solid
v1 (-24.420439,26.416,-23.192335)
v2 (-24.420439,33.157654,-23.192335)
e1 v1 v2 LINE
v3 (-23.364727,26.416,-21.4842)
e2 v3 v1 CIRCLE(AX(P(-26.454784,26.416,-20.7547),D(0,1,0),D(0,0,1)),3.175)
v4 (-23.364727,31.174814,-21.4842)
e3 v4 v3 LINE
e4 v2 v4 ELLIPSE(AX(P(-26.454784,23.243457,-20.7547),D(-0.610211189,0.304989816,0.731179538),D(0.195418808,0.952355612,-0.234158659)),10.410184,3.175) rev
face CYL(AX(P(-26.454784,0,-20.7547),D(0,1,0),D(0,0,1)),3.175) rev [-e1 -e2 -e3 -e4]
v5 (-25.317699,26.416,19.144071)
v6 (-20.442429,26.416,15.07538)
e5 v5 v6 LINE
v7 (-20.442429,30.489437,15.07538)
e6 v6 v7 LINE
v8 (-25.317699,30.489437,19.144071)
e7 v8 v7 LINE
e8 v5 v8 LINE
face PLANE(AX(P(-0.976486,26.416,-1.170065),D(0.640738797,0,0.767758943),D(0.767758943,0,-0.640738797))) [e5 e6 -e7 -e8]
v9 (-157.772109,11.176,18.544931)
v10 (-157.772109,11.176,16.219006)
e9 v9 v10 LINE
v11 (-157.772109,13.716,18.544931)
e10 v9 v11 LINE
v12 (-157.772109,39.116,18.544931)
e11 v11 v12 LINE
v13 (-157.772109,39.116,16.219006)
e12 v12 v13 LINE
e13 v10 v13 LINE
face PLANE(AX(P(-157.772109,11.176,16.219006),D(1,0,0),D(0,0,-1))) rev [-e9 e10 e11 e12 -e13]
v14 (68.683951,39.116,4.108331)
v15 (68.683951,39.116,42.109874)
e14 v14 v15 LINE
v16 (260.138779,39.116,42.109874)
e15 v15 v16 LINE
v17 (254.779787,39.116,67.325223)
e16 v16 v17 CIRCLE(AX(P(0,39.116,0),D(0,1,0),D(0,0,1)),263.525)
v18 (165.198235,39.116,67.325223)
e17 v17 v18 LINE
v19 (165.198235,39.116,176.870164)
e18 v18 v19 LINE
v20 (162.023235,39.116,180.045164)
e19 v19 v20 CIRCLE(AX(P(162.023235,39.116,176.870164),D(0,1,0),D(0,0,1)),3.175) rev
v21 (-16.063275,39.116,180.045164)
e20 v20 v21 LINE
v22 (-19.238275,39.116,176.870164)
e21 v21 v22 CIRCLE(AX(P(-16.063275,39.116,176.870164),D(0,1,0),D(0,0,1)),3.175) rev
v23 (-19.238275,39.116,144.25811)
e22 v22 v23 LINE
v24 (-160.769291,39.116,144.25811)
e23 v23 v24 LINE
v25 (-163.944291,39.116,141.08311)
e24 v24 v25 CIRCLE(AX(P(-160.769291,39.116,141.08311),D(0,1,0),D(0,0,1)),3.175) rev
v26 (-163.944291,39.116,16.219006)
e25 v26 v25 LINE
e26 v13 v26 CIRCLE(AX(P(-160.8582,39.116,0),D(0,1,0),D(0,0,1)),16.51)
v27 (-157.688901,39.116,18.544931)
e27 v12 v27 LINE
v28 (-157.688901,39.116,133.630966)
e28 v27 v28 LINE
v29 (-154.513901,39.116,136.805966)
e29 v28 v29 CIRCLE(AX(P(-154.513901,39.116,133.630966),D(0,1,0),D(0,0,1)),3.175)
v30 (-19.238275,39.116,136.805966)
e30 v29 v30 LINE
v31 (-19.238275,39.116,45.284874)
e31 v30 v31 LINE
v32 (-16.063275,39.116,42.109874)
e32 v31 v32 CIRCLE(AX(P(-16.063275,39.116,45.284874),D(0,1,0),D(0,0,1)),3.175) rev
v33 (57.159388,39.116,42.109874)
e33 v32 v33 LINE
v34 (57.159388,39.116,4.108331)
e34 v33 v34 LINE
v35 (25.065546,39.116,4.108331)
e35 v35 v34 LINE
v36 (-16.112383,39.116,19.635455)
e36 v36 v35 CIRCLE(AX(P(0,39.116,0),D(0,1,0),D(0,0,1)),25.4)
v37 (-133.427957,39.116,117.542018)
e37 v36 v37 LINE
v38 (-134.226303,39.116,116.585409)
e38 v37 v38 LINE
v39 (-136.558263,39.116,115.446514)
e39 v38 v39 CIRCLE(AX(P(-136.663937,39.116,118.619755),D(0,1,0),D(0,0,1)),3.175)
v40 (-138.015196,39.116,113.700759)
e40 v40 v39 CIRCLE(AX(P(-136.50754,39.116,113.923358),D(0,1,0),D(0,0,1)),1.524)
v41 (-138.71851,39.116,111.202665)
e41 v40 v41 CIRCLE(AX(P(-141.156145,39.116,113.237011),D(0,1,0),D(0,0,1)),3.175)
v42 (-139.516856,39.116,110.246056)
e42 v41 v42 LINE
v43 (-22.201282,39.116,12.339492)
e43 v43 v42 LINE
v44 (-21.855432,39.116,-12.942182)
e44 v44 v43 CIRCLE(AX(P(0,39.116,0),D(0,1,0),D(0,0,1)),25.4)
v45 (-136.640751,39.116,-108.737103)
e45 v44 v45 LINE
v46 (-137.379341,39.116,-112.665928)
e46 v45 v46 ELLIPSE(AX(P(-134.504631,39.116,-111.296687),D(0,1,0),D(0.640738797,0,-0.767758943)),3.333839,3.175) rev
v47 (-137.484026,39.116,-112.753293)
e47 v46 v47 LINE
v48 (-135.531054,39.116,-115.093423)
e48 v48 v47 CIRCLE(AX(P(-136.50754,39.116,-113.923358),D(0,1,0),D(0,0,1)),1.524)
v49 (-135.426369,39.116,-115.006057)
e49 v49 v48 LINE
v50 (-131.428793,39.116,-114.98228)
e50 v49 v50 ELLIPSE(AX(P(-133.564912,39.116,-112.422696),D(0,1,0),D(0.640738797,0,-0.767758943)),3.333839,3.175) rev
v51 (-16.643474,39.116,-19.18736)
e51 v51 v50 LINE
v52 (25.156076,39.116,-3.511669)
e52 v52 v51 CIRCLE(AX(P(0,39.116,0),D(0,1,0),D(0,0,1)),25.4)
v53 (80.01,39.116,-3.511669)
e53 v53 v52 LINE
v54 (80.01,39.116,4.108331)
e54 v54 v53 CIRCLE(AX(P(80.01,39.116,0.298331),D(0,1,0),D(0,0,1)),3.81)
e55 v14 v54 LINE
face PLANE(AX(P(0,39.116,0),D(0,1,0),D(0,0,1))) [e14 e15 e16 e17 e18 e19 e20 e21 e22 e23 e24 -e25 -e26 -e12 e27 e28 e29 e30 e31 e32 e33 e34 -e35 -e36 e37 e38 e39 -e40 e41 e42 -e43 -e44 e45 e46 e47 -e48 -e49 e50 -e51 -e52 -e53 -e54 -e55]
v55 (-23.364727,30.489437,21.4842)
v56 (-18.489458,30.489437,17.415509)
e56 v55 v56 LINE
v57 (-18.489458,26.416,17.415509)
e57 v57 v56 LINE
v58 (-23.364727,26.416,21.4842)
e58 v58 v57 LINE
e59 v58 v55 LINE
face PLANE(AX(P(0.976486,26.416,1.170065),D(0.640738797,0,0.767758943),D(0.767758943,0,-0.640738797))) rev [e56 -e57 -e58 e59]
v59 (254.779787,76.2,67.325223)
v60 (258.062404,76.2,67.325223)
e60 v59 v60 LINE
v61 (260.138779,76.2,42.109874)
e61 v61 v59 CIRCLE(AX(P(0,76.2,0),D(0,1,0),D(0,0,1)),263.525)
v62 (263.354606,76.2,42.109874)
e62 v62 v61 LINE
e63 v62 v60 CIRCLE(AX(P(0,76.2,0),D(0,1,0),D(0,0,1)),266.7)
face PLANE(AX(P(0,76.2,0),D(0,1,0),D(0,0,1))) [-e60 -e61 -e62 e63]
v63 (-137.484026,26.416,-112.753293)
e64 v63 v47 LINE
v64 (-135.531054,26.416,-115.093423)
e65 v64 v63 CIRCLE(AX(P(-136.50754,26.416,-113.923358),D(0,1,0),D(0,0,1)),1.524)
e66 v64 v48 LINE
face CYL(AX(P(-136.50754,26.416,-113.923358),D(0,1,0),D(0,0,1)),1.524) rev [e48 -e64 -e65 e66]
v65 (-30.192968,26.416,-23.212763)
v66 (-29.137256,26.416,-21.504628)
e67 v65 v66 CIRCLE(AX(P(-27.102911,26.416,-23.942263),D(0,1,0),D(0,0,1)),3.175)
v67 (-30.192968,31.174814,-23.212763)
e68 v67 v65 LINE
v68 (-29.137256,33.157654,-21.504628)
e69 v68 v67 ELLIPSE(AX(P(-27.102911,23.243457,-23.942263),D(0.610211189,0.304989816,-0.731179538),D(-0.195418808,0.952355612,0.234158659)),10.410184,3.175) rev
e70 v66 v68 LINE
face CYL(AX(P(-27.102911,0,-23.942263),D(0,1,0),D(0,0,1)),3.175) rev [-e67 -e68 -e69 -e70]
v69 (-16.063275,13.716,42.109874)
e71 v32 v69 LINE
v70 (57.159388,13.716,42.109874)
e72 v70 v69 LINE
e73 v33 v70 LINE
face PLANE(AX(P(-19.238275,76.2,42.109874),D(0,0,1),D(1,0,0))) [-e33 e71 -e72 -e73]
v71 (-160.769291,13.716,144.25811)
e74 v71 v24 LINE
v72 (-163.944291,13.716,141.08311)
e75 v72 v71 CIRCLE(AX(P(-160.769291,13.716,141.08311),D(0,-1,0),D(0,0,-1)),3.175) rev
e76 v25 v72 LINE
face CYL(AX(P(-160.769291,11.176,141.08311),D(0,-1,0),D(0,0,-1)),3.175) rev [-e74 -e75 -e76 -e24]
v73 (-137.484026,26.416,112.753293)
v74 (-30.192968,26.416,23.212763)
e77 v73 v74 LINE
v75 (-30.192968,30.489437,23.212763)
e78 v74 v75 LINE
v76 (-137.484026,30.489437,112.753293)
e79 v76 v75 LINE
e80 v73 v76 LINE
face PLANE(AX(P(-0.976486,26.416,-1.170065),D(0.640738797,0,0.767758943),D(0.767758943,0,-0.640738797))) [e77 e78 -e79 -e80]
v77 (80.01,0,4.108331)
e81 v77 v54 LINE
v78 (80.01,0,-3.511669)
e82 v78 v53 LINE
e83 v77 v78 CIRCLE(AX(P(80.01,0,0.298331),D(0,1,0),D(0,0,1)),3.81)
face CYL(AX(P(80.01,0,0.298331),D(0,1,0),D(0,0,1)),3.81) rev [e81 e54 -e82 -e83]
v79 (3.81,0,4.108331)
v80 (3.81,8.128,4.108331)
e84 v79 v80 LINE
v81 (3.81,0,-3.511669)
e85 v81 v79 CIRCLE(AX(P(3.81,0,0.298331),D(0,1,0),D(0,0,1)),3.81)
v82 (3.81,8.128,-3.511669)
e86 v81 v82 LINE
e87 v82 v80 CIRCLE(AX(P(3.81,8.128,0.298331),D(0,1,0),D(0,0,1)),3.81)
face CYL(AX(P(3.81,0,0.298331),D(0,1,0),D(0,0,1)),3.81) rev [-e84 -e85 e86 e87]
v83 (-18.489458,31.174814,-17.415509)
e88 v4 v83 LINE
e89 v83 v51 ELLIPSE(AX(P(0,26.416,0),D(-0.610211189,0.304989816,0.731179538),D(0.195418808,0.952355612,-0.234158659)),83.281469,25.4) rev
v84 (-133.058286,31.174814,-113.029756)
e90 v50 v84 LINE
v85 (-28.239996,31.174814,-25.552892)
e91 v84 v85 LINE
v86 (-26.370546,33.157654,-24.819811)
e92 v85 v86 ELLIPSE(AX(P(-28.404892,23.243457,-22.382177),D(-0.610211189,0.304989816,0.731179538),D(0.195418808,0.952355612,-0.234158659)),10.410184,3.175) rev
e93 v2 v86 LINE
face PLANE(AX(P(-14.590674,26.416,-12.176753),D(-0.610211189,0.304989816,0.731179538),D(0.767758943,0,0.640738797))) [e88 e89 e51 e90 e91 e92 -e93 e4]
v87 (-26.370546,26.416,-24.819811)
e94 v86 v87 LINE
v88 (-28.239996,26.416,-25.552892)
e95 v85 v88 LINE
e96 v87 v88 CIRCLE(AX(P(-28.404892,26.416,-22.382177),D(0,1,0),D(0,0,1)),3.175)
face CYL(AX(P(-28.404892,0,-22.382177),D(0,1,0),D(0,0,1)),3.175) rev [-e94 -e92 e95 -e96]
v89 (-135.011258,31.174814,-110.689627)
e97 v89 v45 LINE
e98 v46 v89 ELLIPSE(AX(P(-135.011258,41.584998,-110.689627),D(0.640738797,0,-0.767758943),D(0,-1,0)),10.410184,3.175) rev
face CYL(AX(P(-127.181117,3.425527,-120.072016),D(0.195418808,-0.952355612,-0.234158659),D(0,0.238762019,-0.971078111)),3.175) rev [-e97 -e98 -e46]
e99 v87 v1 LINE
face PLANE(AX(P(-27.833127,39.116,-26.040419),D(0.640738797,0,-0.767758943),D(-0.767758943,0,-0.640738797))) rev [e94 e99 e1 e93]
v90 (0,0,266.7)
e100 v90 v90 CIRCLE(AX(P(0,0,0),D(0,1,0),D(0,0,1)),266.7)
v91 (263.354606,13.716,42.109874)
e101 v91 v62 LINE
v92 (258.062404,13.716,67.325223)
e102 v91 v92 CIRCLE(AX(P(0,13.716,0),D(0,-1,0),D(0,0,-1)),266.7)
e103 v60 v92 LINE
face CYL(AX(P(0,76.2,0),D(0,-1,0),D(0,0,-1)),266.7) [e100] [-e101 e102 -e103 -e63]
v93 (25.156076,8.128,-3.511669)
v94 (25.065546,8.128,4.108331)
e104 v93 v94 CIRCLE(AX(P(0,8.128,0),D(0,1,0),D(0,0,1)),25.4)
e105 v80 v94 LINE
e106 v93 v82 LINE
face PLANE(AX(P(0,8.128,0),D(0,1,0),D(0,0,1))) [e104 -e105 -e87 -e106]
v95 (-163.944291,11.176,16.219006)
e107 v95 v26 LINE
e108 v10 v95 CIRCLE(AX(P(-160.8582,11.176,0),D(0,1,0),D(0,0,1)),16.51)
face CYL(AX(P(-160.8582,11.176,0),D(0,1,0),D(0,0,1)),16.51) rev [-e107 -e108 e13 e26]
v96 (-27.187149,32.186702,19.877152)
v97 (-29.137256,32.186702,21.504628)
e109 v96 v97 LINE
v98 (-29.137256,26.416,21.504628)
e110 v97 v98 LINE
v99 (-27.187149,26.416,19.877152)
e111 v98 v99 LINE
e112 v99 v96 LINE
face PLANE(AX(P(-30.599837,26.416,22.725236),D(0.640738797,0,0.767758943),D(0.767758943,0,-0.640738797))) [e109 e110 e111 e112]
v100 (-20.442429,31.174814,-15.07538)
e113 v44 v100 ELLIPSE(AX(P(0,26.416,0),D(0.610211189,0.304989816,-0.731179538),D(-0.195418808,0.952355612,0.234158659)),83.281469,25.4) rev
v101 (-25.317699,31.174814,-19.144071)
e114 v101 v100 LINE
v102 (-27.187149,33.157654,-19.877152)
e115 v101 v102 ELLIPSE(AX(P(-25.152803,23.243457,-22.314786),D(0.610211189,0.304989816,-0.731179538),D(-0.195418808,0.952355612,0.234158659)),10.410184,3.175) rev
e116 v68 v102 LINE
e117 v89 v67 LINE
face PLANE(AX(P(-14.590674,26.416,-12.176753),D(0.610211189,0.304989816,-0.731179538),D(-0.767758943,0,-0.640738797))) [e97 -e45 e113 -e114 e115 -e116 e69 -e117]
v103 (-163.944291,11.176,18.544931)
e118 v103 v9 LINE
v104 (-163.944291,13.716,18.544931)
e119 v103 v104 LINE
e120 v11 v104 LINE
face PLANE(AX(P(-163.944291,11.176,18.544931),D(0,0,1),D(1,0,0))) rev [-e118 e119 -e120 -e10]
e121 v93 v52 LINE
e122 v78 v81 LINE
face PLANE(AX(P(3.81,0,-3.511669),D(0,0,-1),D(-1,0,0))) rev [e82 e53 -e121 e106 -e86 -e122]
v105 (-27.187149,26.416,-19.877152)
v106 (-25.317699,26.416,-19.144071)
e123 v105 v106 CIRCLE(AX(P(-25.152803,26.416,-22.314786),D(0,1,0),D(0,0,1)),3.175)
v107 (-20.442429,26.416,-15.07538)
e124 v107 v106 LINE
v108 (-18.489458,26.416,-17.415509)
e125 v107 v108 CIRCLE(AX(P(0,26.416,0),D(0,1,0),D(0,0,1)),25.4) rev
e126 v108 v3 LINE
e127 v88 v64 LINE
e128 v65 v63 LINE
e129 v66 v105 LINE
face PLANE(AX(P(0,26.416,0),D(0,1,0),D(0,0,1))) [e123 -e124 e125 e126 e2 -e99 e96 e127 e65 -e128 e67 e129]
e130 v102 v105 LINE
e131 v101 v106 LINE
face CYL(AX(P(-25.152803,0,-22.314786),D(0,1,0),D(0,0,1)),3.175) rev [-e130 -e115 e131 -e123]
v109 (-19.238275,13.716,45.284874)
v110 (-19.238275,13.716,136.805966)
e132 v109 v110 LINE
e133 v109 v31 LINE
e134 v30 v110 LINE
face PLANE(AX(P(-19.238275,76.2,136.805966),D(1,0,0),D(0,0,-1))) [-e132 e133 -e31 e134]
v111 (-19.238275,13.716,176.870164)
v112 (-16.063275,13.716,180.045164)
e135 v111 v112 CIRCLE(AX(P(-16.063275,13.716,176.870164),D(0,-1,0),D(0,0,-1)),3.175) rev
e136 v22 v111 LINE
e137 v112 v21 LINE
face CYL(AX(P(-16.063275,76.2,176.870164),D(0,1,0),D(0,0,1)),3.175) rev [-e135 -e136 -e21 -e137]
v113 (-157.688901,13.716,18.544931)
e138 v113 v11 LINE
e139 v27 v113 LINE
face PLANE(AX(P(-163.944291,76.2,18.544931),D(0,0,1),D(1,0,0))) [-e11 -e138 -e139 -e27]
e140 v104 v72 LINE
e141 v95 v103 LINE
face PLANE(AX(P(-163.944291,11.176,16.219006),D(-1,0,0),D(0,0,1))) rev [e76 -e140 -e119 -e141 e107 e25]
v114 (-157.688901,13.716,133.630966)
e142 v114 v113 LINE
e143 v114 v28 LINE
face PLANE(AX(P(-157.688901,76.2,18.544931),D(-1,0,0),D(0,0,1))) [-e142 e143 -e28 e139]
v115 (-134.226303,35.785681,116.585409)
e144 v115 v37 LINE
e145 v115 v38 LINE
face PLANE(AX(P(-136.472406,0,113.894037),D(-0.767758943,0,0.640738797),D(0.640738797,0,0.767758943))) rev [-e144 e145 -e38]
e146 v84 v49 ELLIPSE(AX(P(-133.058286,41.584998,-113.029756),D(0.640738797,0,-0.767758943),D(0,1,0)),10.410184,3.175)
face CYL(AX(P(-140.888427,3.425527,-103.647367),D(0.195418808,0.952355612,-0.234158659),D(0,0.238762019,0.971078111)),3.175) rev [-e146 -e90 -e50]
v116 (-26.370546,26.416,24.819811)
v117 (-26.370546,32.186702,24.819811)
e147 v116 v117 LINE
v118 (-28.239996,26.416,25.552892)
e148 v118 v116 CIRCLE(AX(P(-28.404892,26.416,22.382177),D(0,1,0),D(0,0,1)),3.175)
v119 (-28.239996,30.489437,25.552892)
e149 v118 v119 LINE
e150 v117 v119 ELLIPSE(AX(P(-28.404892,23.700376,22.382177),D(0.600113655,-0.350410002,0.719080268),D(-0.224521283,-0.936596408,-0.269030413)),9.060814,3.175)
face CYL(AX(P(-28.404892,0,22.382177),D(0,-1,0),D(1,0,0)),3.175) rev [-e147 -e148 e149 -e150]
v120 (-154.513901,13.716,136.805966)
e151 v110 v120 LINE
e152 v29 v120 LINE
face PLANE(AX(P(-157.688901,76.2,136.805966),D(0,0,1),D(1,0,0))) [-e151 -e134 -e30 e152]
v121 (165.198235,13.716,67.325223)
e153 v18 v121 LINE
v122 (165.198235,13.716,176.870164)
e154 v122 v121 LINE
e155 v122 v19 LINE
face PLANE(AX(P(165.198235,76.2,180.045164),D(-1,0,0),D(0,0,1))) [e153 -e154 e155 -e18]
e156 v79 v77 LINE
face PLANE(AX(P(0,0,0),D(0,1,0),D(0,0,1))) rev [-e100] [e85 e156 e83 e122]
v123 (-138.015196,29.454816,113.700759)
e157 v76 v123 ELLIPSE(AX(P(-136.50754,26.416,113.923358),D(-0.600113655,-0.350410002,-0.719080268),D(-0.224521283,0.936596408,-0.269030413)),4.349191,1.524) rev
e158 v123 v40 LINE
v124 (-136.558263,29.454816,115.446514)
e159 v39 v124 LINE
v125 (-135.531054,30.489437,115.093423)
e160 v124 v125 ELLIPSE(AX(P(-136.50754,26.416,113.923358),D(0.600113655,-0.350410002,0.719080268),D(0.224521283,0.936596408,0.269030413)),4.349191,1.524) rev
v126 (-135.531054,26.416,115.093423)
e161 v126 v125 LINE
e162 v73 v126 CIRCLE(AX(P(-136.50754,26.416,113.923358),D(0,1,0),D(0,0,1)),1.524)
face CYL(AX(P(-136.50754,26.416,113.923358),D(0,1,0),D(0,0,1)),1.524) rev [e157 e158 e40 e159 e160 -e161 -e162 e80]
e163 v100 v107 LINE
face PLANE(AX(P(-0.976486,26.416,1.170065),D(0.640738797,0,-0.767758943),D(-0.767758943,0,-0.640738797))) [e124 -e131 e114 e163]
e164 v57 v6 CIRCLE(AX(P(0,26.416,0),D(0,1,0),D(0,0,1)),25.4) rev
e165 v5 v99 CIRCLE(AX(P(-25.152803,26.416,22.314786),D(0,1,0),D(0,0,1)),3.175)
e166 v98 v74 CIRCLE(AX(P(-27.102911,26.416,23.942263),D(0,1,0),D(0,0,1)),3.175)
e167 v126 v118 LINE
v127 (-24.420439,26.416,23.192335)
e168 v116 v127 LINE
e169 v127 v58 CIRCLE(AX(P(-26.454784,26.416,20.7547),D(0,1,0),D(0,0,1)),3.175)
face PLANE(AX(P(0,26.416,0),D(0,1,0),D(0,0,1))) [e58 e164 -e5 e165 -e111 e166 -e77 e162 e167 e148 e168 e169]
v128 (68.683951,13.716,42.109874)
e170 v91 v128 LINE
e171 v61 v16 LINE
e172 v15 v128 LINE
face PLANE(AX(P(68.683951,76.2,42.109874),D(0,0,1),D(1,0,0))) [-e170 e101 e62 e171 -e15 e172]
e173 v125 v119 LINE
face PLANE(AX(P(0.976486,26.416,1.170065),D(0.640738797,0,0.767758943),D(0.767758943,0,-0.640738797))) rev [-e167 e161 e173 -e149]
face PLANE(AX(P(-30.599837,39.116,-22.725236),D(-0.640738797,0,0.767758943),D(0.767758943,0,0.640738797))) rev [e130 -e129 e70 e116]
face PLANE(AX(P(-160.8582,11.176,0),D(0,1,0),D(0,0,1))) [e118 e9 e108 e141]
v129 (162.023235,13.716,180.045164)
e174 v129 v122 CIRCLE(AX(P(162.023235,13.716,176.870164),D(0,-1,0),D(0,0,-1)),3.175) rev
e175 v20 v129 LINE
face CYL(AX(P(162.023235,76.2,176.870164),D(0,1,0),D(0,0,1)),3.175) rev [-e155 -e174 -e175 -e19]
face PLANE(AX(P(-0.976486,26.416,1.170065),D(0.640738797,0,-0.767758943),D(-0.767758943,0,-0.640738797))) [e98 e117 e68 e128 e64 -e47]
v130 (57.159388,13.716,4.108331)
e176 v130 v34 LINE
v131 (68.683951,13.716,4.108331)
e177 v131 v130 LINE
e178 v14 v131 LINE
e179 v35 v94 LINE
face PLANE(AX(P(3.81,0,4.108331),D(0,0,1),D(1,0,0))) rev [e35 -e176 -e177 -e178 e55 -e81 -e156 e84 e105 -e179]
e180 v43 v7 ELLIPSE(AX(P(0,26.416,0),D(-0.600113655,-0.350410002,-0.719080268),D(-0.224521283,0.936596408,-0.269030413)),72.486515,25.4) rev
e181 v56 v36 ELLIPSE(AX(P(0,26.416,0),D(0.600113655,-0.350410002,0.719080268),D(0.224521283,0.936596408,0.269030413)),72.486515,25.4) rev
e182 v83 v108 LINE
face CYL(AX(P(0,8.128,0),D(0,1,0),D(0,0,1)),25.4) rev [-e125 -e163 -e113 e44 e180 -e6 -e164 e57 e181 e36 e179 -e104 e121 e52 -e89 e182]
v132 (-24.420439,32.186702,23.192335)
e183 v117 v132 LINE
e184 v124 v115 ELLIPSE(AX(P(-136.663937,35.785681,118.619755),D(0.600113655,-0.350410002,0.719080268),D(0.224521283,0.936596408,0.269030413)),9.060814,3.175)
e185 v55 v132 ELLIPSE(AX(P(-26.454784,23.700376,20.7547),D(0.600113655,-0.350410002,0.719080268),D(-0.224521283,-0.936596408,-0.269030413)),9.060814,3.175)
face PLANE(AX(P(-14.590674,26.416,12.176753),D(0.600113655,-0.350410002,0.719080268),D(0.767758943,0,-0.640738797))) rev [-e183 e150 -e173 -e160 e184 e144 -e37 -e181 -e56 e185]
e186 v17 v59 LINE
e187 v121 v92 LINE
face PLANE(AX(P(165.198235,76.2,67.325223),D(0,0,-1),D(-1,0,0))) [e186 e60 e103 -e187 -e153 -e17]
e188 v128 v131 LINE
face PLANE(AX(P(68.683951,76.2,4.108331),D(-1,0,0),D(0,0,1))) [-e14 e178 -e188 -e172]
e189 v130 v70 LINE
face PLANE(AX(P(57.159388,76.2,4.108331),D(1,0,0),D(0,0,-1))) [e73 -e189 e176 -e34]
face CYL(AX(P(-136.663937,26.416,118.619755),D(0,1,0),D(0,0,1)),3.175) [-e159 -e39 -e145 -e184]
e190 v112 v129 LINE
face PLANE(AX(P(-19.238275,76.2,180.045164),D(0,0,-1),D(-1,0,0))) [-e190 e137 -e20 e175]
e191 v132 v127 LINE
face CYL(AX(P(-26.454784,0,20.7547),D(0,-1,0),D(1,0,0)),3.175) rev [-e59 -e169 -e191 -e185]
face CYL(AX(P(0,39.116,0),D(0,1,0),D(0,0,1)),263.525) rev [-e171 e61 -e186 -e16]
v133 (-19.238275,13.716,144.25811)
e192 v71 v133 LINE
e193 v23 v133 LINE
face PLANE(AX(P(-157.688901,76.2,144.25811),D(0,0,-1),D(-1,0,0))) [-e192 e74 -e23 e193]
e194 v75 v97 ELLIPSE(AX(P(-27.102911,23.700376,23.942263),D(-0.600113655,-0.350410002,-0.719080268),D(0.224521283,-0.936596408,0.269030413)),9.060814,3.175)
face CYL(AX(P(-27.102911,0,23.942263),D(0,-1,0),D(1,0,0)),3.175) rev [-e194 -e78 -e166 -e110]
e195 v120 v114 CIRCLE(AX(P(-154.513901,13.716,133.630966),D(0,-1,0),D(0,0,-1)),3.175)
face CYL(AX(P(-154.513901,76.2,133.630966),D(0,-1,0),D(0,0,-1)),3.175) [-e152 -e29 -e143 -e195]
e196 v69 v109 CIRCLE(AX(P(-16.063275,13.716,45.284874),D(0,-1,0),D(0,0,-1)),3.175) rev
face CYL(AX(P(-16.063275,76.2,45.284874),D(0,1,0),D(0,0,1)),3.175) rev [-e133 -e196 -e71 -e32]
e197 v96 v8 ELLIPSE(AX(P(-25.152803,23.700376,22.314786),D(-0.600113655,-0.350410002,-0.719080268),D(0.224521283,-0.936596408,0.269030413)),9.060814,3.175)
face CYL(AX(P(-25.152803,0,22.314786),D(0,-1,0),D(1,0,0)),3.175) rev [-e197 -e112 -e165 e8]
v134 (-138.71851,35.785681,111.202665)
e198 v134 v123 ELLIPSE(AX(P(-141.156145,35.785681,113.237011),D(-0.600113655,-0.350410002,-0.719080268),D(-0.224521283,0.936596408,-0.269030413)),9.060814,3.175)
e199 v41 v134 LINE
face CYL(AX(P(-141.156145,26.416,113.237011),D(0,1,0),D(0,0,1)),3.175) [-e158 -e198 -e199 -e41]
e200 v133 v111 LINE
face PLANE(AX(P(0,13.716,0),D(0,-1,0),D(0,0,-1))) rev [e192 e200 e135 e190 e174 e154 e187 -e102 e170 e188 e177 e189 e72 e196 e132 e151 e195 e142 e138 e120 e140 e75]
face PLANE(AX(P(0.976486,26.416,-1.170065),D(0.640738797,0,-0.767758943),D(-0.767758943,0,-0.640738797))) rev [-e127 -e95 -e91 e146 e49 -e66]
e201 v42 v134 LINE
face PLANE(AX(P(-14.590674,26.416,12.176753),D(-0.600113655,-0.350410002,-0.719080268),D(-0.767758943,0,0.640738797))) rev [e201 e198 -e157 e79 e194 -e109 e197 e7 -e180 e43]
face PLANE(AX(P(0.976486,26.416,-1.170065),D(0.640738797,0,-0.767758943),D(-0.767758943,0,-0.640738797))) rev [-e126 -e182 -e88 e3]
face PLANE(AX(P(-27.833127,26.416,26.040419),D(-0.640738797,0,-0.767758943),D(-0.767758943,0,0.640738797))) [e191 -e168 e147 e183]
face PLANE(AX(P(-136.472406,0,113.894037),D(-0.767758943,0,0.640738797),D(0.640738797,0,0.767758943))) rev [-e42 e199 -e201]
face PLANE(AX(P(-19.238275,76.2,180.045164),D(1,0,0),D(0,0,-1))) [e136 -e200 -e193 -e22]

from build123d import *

# Parameters (mm, degrees)
SKETCH1_R                = 266.7
BOSS_EXTRUDE1_DEPTH      = 76.2
SKETCH2_R                = 263.525
CUT_EXTRUDE1_DEPTH       = 37.084
SKETCH3_R                = 25.4
CUT_EXTRUDE2_DEPTH       = 30.988
CUT_EXTRUDE3_DEPTH       = 380.193672753
CUT_EXTRUDE4_DEPTH       = 12.7
CUT_EXTRUDE5_DEPTH       = 6.35
CUT_EXTRUDE5_DEPTH_BACK  = 152.4
CUT_EXTRUDE6_DEPTH       = 152.4
CUT_EXTRUDE6_DEPTH_BACK  = 6.35
SKETCH12_W               = 4.318
SKETCH12_H               = 15.080276974
CUT_EXTRUDE10_DEPTH      = 6.35
SKETCH14_W               = 4.318
SKETCH14_H               = 12.7
CUT_EXTRUDE11_DEPTH      = 6.35
CUT_EXTRUDE12_DEPTH      = 27.94
FILLET3_R                = 3.175
FILLET4_R                = 3.175
FILLET5_R                = 3.175
FILLET6_R                = 3.175
CUT_EXTRUDE13_DEPTH      = 380.193672753
CUT_EXTRUDE13_DEPTH_BACK = 25.4
FILLET8_R                = 3.175


with BuildPart() as part:
    # Sketch1 → Boss-Extrude1 (new body)
    with BuildSketch(Plane(origin=(0, 0, 0), x_dir=(1, 0, 0), z_dir=(0, 1, 0))):
        with Locations(Location((0, 0, 0), (0, 0, 90))):
            Circle(SKETCH1_R)
    extrude(amount=BOSS_EXTRUDE1_DEPTH)

    # Sketch2 → Cut-Extrude1 (cut)
    with BuildSketch(Plane(origin=(0, 76.2, 0), x_dir=(1, 0, 0), z_dir=(0, 1, 0))):
        with Locations(Location((0, 0, 0), (0, 0, 270))):
            Circle(SKETCH2_R)
    extrude(amount=-CUT_EXTRUDE1_DEPTH, mode=Mode.SUBTRACT)

    # Sketch3 → Cut-Extrude2 (cut)
    with BuildSketch(Plane(origin=(0, 39.116, 0), x_dir=(1, 0, 0), z_dir=(0, 1, 0))):
        with Locations(Location((0, 0, 0), (0, 0, 270))):
            Circle(SKETCH3_R)
    extrude(amount=-CUT_EXTRUDE2_DEPTH, mode=Mode.SUBTRACT)

    # Sketch4 → Cut-Extrude3 (cut, through all)
    with BuildSketch(Plane(origin=(0, 39.116, 0), x_dir=(1, 0, 0), z_dir=(0, 1, 0))):
        with BuildLine():
            Line((3.81, 3.511669421), (80.01, 3.511669421))
            ThreePointArc((80.01, 3.511669421), (83.82, -0.298330579), (80.01, -4.108330579))
            Line((80.01, -4.108330579), (3.81, -4.108330579))
            ThreePointArc((3.81, -4.108330579), (0, -0.298330579), (3.81, 3.511669421))
        make_face()
    extrude(amount=-CUT_EXTRUDE3_DEPTH, mode=Mode.SUBTRACT)

    # Sketch5 → Cut-Extrude4 (cut)
    with BuildSketch(Plane(origin=(0, 39.116, 0), x_dir=(1, 0, 0), z_dir=(0, 1, 0))):
        with BuildLine():
            ThreePointArc((-18.489457636, -17.415509074), (-19.50107715, -16.274765436), (-20.442429489, -15.075379816))
            Line((-20.442429489, -15.075379816), (-137.484025976, -112.753293422))
            ThreePointArc((-137.484025976, -112.753293422), (-137.677604679, -114.899843977), (-135.531054124, -115.09342268))
            Line((-135.531054124, -115.09342268), (-18.489457636, -17.415509074))
        make_face()
        with BuildLine():
            Line((-0.976485926, -1.170064629), (-137.484025976, 112.753293422))
            ThreePointArc((-137.484025976, 112.753293422), (-137.677604679, 114.899843977), (-135.531054124, 115.09342268))
            Line((-135.531054124, 115.09342268), (0.976485926, 1.170064629))
            ThreePointArc((0.976485926, 1.170064629), (1.170064629, -0.976485926), (-0.976485926, -1.170064629))
        make_face()
    extrude(amount=-CUT_EXTRUDE4_DEPTH, mode=Mode.SUBTRACT)

    # Sketch6 → Cut-Extrude5 (cut, two sides: drawn at the far end of the back side and taken through both)
    with BuildSketch(Plane(origin=(-19.465943562, 0, -16.245444445), x_dir=(0.6407387966858445, 0, -0.7677589429121461), z_dir=(0.7677589429121461, 0, 0.6407387966858445)).offset(-CUT_EXTRUDE5_DEPTH_BACK)):
        Polygon((0, 26.416), (-4.067147417, 39.116), (4.067147417, 39.116), align=None)
    extrude(amount=CUT_EXTRUDE5_DEPTH + CUT_EXTRUDE5_DEPTH_BACK, mode=Mode.SUBTRACT)

    # Sketch11 → Cut-Extrude6 (cut, two sides: drawn at the far end of the back side and taken through both)
    with BuildSketch(Plane(origin=(-19.465943562, 0, 16.245444445), x_dir=(0.6407387966858473, 0, 0.7677589429121437), z_dir=(-0.7677589429121437, 0, 0.6407387966858473)).offset(-CUT_EXTRUDE6_DEPTH_BACK)):
        Polygon((0, 26.416), (4.751467106, 39.116), (-4.751467106, 39.116), align=None)
    extrude(amount=CUT_EXTRUDE6_DEPTH + CUT_EXTRUDE6_DEPTH_BACK, mode=Mode.SUBTRACT)

    # Sketch12 → Cut-Extrude10 (cut)
    with BuildSketch(Plane(origin=(-24.34121285, 0, 20.314135804), x_dir=(0.6407387966858473, 0, 0.7677589429121437), z_dir=(-0.7677589429121437, 0, 0.6407387966858473))):
        with Locations((0, 33.956138487)):
            Rectangle(SKETCH12_W, SKETCH12_H)
    extrude(amount=CUT_EXTRUDE10_DEPTH, mode=Mode.SUBTRACT)

    # Sketch14 → Cut-Extrude11 (cut)
    with BuildSketch(Plane(origin=(-24.34121285, 0, -20.314135804), x_dir=(0.6407387966858445, 0, -0.7677589429121461), z_dir=(0.7677589429121461, 0, 0.6407387966858445))):
        with Locations((0, 32.766)):
            Rectangle(SKETCH14_W, SKETCH14_H)
    extrude(amount=-CUT_EXTRUDE11_DEPTH, mode=Mode.SUBTRACT)

    # Sketch15 → Cut-Extrude12 (cut)
    with BuildSketch(Plane(origin=(0, 39.116, 0), x_dir=(1, 0, 0), z_dir=(0, 1, 0))):
        with BuildLine():
            Line((-163.944291355, -16.219005523), (-163.944291355, -18.54493052))
            Line((-163.944291355, -18.54493052), (-157.772108645, -18.54493052))
            Line((-157.772108645, -18.54493052), (-157.772108645, -16.219005523))
            ThreePointArc((-157.772108645, -16.219005523), (-160.8582, 16.51), (-163.944291355, -16.219005523))
        make_face()
    extrude(amount=-CUT_EXTRUDE12_DEPTH, mode=Mode.SUBTRACT)

    # Fillet3
    # the kernel refuses this fillet: 3.175 mm, written as the material it adds along each edge
    with BuildSketch(Plane(origin=(-22.957857788, 37.920153839, -21.971727362), x_dir=(-0.7677589429121467, 0, -0.6407387966858438), z_dir=(0, -1, 0))) as fillet3_piece_1_section:
        with BuildLine():
            CenterArc((1.905, -3.175), FILLET3_R, 90, 36.869897646)
            Line((0, -0.635), (-0.0381, -0.5842))
            ThreePointArc((-0.0381, -0.5842), (-0.0635, -0.3175), (-0.0635, 0))
            Line((-0.0635, 0), (0, 0.0635))
            Line((0, 0.0635), (1.905, 0.0635))
            Line((1.905, 0.0635), (1.905, 0))
        make_face()
    fillet3_piece_1 = extrude(amount=16.266653839, mode=Mode.PRIVATE)
    fillet3_piece_1 = split(fillet3_piece_1, bisect_by=Plane(origin=(-24.062062875, 29.877521432, -21.52503997), z_dir=(0.6102111889180302, -0.3049898163702348, -0.731179538027217)), keep=Keep.TOP, mode=Mode.PRIVATE)
    add(fillet3_piece_1)

    # Fillet4
    # the kernel refuses this fillet: 3.175 mm, written as the material it adds along each edge
    with BuildSketch(Plane(origin=(-27.833127075, 21.6535, 26.040418721), x_dir=(-0.640738796685741, 0, -0.7677589429122325), z_dir=(0, 1, 0))) as fillet4_piece_1_section:
        with BuildLine():
            CenterArc((3.175, -1.905), FILLET4_R, 143.130102354, 36.869897646)
            Line((0, -1.905), (-0.0635, -1.905))
            Line((-0.0635, -1.905), (-0.0635, 0))
            Line((-0.0635, 0), (0, 0.0635))
            ThreePointArc((0, 0.0635), (0.3175, 0.0635), (0.5842, 0.0381))
            Line((0.5842, 0.0381), (0.635, 0))
        make_face()
    fillet4_piece_1 = extrude(amount=15.295701846, mode=Mode.PRIVATE)
    fillet4_piece_1 = split(fillet4_piece_1, bisect_by=Plane(origin=(-29.144428623, 24.988566888, 23.627101883), z_dir=(0.6001136551613587, -0.35041000177300097, 0.7190802678048671)), keep=Keep.TOP, mode=Mode.PRIVATE)
    add(fillet4_piece_1)
    with BuildSketch(Plane(origin=(-30.599837199, 36.949201846, 22.725235606), x_dir=(0.7677589429121437, 0, -0.6407387966858474), z_dir=(0, -1, 0))) as fillet4_piece_2_section:
        with BuildLine():
            CenterArc((1.905, 3.175), FILLET4_R, 233.130102354, 36.869897646)
            Line((0, 0.635), (-0.0381, 0.5842))
            ThreePointArc((-0.0381, 0.5842), (-0.0635, 0.3175), (-0.0635, 0))
            Line((-0.0635, 0), (0, -0.0635))
            Line((0, -0.0635), (1.905, -0.0635))
            Line((1.905, -0.0635), (1.905, 0))
        make_face()
    fillet4_piece_2 = extrude(amount=15.295701846, mode=Mode.PRIVATE)
    fillet4_piece_2 = split(fillet4_piece_2, bisect_by=Plane(origin=(-29.514976804, 29.459680247, 23.148743411), z_dir=(-0.6001136551613584, -0.3504100017730014, -0.7190802678048671)), keep=Keep.TOP, mode=Mode.PRIVATE)
    add(fillet4_piece_2)
    with BuildSketch(Plane(origin=(-25.724567912, 36.949201846, 18.656544247), x_dir=(0.6407387966857708, 0, 0.7677589429122077), z_dir=(0, -1, 0))) as fillet4_piece_3_section:
        with BuildLine():
            CenterArc((3.175, 1.905), FILLET4_R, 180, 36.869897646)
            Line((0, 1.905), (-0.0635, 1.905))
            Line((-0.0635, 1.905), (-0.0635, 0))
            Line((-0.0635, 0), (0, -0.0635))
            ThreePointArc((0, -0.0635), (0.3175, -0.0635), (0.5842, -0.0381))
            Line((0.5842, -0.0381), (0.635, 0))
        make_face()
    fillet4_piece_3 = extrude(amount=15.295701846, mode=Mode.PRIVATE)
    fillet4_piece_3 = split(fillet4_piece_3, bisect_by=Plane(origin=(-25.501982789, 29.459680247, 19.799670137), z_dir=(-0.6001136551613584, -0.3504100017730014, -0.7190802678048671)), keep=Keep.TOP, mode=Mode.PRIVATE)
    add(fillet4_piece_3)
    with BuildSketch(Plane(origin=(-22.957857788, 21.6535, 21.971727362), x_dir=(-0.767758942912144, 0, 0.640738796685847), z_dir=(0, 1, 0))) as fillet4_piece_4_section:
        with BuildLine():
            CenterArc((1.905, -3.175), FILLET4_R, 90, 36.869897646)
            Line((0, -0.635), (-0.0381, -0.5842))
            ThreePointArc((-0.0381, -0.5842), (-0.0635, -0.3175), (-0.0635, 0))
            Line((-0.0635, 0), (0, 0.0635))
            Line((0, 0.0635), (1.905, 0.0635))
            Line((1.905, 0.0635), (1.905, 0))
        make_face()
    fillet4_piece_4 = extrude(amount=15.295701846, mode=Mode.PRIVATE)
    fillet4_piece_4 = split(fillet4_piece_4, bisect_by=Plane(origin=(-25.09763609, 24.988566888, 20.249821811), z_dir=(0.6001136551613587, -0.35041000177300097, 0.7190802678048671)), keep=Keep.TOP, mode=Mode.PRIVATE)
    add(fillet4_piece_4)
    with BuildSketch(Plane(origin=(-30.599837199, 21.6535, -22.725235606), x_dir=(0.6407387966859301, 0, -0.7677589429120746), z_dir=(0, 1, 0))) as fillet4_piece_5_section:
        with BuildLine():
            CenterArc((3.175, -1.905), FILLET4_R, 143.130102354, 36.869897646)
            Line((0, -1.905), (-0.0635, -1.905))
            Line((-0.0635, -1.905), (-0.0635, 0))
            Line((-0.0635, 0), (0, 0.0635))
            ThreePointArc((0, 0.0635), (0.3175, 0.0635), (0.5842, 0.0381))
            Line((0.5842, 0.0381), (0.635, 0))
        make_face()
    fillet4_piece_5 = extrude(amount=16.266653839, mode=Mode.PRIVATE)
    fillet4_piece_5 = split(fillet4_piece_5, bisect_by=Plane(origin=(-28.479191191, 24.841632974, -24.424216075), z_dir=(-0.6102111889180335, -0.30498981637021927, 0.7311795380272208)), keep=Keep.TOP, mode=Mode.PRIVATE)
    add(fillet4_piece_5)
    with BuildSketch(Plane(origin=(-27.833127075, 37.920153839, -26.040418721), x_dir=(0.767758942912146, 0, 0.6407387966858447), z_dir=(0, -1, 0))) as fillet4_piece_6_section:
        with BuildLine():
            CenterArc((1.905, 3.175), FILLET4_R, 233.130102354, 36.869897646)
            Line((0, 0.635), (-0.0381, 0.5842))
            ThreePointArc((-0.0381, 0.5842), (-0.0635, 0.3175), (-0.0635, 0))
            Line((-0.0635, 0), (0, -0.0635))
            Line((0, -0.0635), (1.905, -0.0635))
            Line((1.905, -0.0635), (1.905, 0))
        make_face()
    fillet4_piece_6 = extrude(amount=16.266653839, mode=Mode.PRIVATE)
    fillet4_piece_6 = split(fillet4_piece_6, bisect_by=Plane(origin=(-28.075056891, 29.877521432, -24.874113244), z_dir=(0.6102111889181517, -0.30498981637007594, -0.731179538027182)), keep=Keep.TOP, mode=Mode.PRIVATE)
    add(fillet4_piece_6)
    with BuildSketch(Plane(origin=(-25.724567912, 21.6535, -18.656544247), x_dir=(-0.7677589429121459, 0, -0.6407387966858448), z_dir=(0, 1, 0))) as fillet4_piece_7_section:
        with BuildLine():
            CenterArc((1.905, -3.175), FILLET4_R, 90, 36.869897646)
            Line((0, -0.635), (-0.0381, -0.5842))
            ThreePointArc((-0.0381, -0.5842), (-0.0635, -0.3175), (-0.0635, 0))
            Line((-0.0635, 0), (0, 0.0635))
            Line((0, 0.0635), (1.905, 0.0635))
            Line((1.905, 0.0635), (1.905, 0))
        make_face()
    fillet4_piece_7 = extrude(amount=16.266653839, mode=Mode.PRIVATE)
    fillet4_piece_7 = split(fillet4_piece_7, bisect_by=Plane(origin=(-24.432398658, 24.841632974, -21.046936002), z_dir=(-0.6102111889180335, -0.30498981637021927, 0.7311795380272208)), keep=Keep.TOP, mode=Mode.PRIVATE)
    add(fillet4_piece_7)

    # Fillet5
    # the kernel refuses this fillet: 3.175 mm, written as the material it adds along each edge
    with BuildSketch(Plane(origin=(-132.315290532, 46.675322671, -118.875260218), x_dir=(0.7677589429120775, 3.430744963368742e-14, 0.6407387966859268), z_dir=(-0.19541880794250094, -0.9523556121063447, 0.23415865901538102))) as fillet5_piece_1_section:
        with BuildLine():
            CenterArc((FILLET5_R, FILLET5_R), FILLET5_R, 180, 90)
            Line((0, FILLET5_R), (0, 0))
            Line((0, 0), (FILLET5_R, 0))
        make_face()
    fillet5_piece_1 = extrude(amount=24.213466665, mode=Mode.PRIVATE)
    fillet5_piece_1 = split(fillet5_piece_1, bisect_by=Plane(origin=(-134.161464886, 39.116, -115.294765638), z_dir=(0, -1, 0)), keep=Keep.TOP, mode=Mode.PRIVATE)
    fillet5_piece_1 = split(fillet5_piece_1, bisect_by=Plane(origin=(-134.822791784, 35.893084099, -114.502337205), z_dir=(0.6407387966858452, 0, -0.7677589429121455)), keep=Keep.TOP, mode=Mode.PRIVATE)
    add(fillet5_piece_1)
    with BuildSketch(Plane(origin=(-132.315290532, 46.675322671, -118.875260218), x_dir=(0.7677589429120775, 3.430744963368742e-14, 0.6407387966859268), z_dir=(-0.19541880794250094, -0.9523556121063447, 0.23415865901538102))) as fillet5_piece_2_section:
        with BuildLine():
            CenterArc((FILLET5_R, FILLET5_R), FILLET5_R, 180, 90)
            Line((0, FILLET5_R), (0, 0))
            Line((0, 0), (FILLET5_R, 0))
        make_face()
    fillet5_piece_2 = extrude(amount=24.213466665, mode=Mode.PRIVATE)
    fillet5_piece_2 = split(fillet5_piece_2, bisect_by=Plane(origin=(-137.32634275, 25.904168976, -112.621697741), z_dir=(-0.640738796685845, 0, 0.7677589429121457)), keep=Keep.TOP, mode=Mode.PRIVATE)
    add(fillet5_piece_2)
    with BuildSketch(Plane(origin=(-135.8977556, 23.615491804, -114.582606787), x_dir=(0.7677589429121472, 0, 0.6407387966858433), z_dir=(-0.19541880794249095, 0.9523556121063497, 0.23415865901536906))) as fillet5_piece_3_section:
        with BuildLine():
            CenterArc((FILLET5_R, FILLET5_R), FILLET5_R, 180, 90)
            Line((0, FILLET5_R), (0, 0))
            Line((0, 0), (FILLET5_R, 0))
        make_face()
    fillet5_piece_3 = extrude(amount=24.213466665, mode=Mode.PRIVATE)
    fillet5_piece_3 = split(fillet5_piece_3, bisect_by=Plane(origin=(-135.373370898, 25.904168977, -114.961826999), z_dir=(0.6407387966858452, 0, -0.7677589429121455)), keep=Keep.TOP, mode=Mode.PRIVATE)
    add(fillet5_piece_3)
    with BuildSketch(Plane(origin=(-135.8977556, 23.615491804, -114.582606787), x_dir=(0.7677589429121472, 0, 0.6407387966858433), z_dir=(-0.19541880794249095, 0.9523556121063497, 0.23415865901536906))) as fillet5_piece_4_section:
        with BuildLine():
            CenterArc((FILLET5_R, FILLET5_R), FILLET5_R, 180, 90)
            Line((0, FILLET5_R), (0, 0))
            Line((0, 0), (FILLET5_R, 0))
        make_face()
    fillet5_piece_4 = extrude(amount=24.213466665, mode=Mode.PRIVATE)
    fillet5_piece_4 = split(fillet5_piece_4, bisect_by=Plane(origin=(-137.437090535, 39.116, -111.369779514), z_dir=(0, -1, 0)), keep=Keep.TOP, mode=Mode.PRIVATE)
    fillet5_piece_4 = split(fillet5_piece_4, bisect_by=Plane(origin=(-136.775763636, 35.893084099, -112.162207947), z_dir=(-0.640738796685845, 0, 0.7677589429121457)), keep=Keep.TOP, mode=Mode.PRIVATE)
    add(fillet5_piece_4)

    # Fillet6
    # the kernel refuses this fillet: 3.175 mm, written as the material it takes off along each edge
    with BuildSketch(Plane(origin=(-135.495920536, 44.069726972, 115.064101689), x_dir=(-0.9408962833877623, 0, 0.3386948241516185), z_dir=(0, -1, 0))) as fillet6_piece_1_section:
        with BuildLine():
            CenterArc((2.303263748, -2.949899465), FILLET6_R, 111.704706858, 48.245736997)
            Line((-0.67931998, -1.861405413), (-0.977578353, -1.752556008))
            Line((-0.977578353, -1.752556008), (-0.298258373, 0.108849405))
            Line((-0.298258373, 0.108849405), (0.108849405, 0.298258373))
            ThreePointArc((0.108849405, 0.298258373), (0.151837335, 0.282569926), (1.011656626, 0.294989946))
            Line((1.011656626, 0.294989946), (1.129075455, 0))
        make_face()
    fillet6_piece_1 = extrude(amount=18.534017348, mode=Mode.PRIVATE)
    fillet6_piece_1 = split(fillet6_piece_1, bisect_by=Plane(origin=(-134.042471425, 37.040108879, 117.043277716), z_dir=(-0.6001136551613587, 0.3504100017730009, -0.7190802678048671)), keep=Keep.TOP, mode=Mode.PRIVATE)
    add(fillet6_piece_1, mode=Mode.SUBTRACT)
    with BuildSketch(Plane(origin=(-137.448892388, 25.535709624, 112.723972431), x_dir=(-0.6407387966858429, 0, -0.7677589429121475), z_dir=(0, 1, 0))) as fillet6_piece_2_section:
        with BuildLine():
            CenterArc((1.981490789, 3.175), FILLET6_R, 221.754263003, 48.245736997)
            Line((-0.387084068, 1.060649474), (-0.623941554, 0.849214422))
            ThreePointArc((-0.623941554, 0.849214422), (-0.3175, 0.045761222), (-0.3175, 0))
            Line((-0.3175, 0), (0, -0.3175))
            Line((0, -0.3175), (1.981490789, -0.3175))
            Line((1.981490789, -0.3175), (1.981490789, 0))
        make_face()
    fillet6_piece_2 = extrude(amount=18.534017348, mode=Mode.PRIVATE)
    fillet6_piece_2 = split(fillet6_piece_2, bisect_by=Plane(origin=(-139.136103081, 37.040108879, 110.939883828), z_dir=(0.6001136551610721, 0.3504100017730421, 0.7190802678050863)), keep=Keep.TOP, mode=Mode.PRIVATE)
    add(fillet6_piece_2, mode=Mode.SUBTRACT)

    # Sketch18 → Cut-Extrude13 (cut, two sides: drawn at the far end of the back side and taken through both)
    with BuildSketch(Plane(origin=(0, 39.116, 0), x_dir=(1, 0, 0), z_dir=(0, 1, 0)).offset(-CUT_EXTRUDE13_DEPTH_BACK)):
        Polygon((-19.238275413, -180.045164459), (165.198234521, -180.045164459), (165.198234521, -67.325222668), (267.08562237, -67.325222668), (267.08562237, -42.109873745), (165.198234521, -42.109873745), (68.68395137, -42.109873745), (68.68395137, -4.108330579), (57.159387951, -4.108330579), (57.159387951, -42.109873745), (-19.238275413, -42.109873745), (-19.238275413, -136.80596573), (-157.688900722, -136.80596573), (-157.688900722, -18.54493052), (-163.944291355, -18.54493052), (-163.944291355, -144.258110226), (-157.688900722, -144.258110226), (-19.238275413, -144.258110226), align=None)
    extrude(amount=CUT_EXTRUDE13_DEPTH + CUT_EXTRUDE13_DEPTH_BACK, mode=Mode.SUBTRACT)

    # Fillet8
    fillet8_edges = [part.edges().sort_by_distance(p)[0] for p in [
        (-19.238275413, 26.416, 180.045164459),
        (165.198234521, 26.416, 180.045164459),
        (-19.238275413, 26.416, 42.109873745),
        (-157.688900722, 26.416, 136.80596573),
        (-163.944291355, 26.416, 144.258110226),
    ]]
    fillet(fillet8_edges, radius=FILLET8_R)


solid = part.part
